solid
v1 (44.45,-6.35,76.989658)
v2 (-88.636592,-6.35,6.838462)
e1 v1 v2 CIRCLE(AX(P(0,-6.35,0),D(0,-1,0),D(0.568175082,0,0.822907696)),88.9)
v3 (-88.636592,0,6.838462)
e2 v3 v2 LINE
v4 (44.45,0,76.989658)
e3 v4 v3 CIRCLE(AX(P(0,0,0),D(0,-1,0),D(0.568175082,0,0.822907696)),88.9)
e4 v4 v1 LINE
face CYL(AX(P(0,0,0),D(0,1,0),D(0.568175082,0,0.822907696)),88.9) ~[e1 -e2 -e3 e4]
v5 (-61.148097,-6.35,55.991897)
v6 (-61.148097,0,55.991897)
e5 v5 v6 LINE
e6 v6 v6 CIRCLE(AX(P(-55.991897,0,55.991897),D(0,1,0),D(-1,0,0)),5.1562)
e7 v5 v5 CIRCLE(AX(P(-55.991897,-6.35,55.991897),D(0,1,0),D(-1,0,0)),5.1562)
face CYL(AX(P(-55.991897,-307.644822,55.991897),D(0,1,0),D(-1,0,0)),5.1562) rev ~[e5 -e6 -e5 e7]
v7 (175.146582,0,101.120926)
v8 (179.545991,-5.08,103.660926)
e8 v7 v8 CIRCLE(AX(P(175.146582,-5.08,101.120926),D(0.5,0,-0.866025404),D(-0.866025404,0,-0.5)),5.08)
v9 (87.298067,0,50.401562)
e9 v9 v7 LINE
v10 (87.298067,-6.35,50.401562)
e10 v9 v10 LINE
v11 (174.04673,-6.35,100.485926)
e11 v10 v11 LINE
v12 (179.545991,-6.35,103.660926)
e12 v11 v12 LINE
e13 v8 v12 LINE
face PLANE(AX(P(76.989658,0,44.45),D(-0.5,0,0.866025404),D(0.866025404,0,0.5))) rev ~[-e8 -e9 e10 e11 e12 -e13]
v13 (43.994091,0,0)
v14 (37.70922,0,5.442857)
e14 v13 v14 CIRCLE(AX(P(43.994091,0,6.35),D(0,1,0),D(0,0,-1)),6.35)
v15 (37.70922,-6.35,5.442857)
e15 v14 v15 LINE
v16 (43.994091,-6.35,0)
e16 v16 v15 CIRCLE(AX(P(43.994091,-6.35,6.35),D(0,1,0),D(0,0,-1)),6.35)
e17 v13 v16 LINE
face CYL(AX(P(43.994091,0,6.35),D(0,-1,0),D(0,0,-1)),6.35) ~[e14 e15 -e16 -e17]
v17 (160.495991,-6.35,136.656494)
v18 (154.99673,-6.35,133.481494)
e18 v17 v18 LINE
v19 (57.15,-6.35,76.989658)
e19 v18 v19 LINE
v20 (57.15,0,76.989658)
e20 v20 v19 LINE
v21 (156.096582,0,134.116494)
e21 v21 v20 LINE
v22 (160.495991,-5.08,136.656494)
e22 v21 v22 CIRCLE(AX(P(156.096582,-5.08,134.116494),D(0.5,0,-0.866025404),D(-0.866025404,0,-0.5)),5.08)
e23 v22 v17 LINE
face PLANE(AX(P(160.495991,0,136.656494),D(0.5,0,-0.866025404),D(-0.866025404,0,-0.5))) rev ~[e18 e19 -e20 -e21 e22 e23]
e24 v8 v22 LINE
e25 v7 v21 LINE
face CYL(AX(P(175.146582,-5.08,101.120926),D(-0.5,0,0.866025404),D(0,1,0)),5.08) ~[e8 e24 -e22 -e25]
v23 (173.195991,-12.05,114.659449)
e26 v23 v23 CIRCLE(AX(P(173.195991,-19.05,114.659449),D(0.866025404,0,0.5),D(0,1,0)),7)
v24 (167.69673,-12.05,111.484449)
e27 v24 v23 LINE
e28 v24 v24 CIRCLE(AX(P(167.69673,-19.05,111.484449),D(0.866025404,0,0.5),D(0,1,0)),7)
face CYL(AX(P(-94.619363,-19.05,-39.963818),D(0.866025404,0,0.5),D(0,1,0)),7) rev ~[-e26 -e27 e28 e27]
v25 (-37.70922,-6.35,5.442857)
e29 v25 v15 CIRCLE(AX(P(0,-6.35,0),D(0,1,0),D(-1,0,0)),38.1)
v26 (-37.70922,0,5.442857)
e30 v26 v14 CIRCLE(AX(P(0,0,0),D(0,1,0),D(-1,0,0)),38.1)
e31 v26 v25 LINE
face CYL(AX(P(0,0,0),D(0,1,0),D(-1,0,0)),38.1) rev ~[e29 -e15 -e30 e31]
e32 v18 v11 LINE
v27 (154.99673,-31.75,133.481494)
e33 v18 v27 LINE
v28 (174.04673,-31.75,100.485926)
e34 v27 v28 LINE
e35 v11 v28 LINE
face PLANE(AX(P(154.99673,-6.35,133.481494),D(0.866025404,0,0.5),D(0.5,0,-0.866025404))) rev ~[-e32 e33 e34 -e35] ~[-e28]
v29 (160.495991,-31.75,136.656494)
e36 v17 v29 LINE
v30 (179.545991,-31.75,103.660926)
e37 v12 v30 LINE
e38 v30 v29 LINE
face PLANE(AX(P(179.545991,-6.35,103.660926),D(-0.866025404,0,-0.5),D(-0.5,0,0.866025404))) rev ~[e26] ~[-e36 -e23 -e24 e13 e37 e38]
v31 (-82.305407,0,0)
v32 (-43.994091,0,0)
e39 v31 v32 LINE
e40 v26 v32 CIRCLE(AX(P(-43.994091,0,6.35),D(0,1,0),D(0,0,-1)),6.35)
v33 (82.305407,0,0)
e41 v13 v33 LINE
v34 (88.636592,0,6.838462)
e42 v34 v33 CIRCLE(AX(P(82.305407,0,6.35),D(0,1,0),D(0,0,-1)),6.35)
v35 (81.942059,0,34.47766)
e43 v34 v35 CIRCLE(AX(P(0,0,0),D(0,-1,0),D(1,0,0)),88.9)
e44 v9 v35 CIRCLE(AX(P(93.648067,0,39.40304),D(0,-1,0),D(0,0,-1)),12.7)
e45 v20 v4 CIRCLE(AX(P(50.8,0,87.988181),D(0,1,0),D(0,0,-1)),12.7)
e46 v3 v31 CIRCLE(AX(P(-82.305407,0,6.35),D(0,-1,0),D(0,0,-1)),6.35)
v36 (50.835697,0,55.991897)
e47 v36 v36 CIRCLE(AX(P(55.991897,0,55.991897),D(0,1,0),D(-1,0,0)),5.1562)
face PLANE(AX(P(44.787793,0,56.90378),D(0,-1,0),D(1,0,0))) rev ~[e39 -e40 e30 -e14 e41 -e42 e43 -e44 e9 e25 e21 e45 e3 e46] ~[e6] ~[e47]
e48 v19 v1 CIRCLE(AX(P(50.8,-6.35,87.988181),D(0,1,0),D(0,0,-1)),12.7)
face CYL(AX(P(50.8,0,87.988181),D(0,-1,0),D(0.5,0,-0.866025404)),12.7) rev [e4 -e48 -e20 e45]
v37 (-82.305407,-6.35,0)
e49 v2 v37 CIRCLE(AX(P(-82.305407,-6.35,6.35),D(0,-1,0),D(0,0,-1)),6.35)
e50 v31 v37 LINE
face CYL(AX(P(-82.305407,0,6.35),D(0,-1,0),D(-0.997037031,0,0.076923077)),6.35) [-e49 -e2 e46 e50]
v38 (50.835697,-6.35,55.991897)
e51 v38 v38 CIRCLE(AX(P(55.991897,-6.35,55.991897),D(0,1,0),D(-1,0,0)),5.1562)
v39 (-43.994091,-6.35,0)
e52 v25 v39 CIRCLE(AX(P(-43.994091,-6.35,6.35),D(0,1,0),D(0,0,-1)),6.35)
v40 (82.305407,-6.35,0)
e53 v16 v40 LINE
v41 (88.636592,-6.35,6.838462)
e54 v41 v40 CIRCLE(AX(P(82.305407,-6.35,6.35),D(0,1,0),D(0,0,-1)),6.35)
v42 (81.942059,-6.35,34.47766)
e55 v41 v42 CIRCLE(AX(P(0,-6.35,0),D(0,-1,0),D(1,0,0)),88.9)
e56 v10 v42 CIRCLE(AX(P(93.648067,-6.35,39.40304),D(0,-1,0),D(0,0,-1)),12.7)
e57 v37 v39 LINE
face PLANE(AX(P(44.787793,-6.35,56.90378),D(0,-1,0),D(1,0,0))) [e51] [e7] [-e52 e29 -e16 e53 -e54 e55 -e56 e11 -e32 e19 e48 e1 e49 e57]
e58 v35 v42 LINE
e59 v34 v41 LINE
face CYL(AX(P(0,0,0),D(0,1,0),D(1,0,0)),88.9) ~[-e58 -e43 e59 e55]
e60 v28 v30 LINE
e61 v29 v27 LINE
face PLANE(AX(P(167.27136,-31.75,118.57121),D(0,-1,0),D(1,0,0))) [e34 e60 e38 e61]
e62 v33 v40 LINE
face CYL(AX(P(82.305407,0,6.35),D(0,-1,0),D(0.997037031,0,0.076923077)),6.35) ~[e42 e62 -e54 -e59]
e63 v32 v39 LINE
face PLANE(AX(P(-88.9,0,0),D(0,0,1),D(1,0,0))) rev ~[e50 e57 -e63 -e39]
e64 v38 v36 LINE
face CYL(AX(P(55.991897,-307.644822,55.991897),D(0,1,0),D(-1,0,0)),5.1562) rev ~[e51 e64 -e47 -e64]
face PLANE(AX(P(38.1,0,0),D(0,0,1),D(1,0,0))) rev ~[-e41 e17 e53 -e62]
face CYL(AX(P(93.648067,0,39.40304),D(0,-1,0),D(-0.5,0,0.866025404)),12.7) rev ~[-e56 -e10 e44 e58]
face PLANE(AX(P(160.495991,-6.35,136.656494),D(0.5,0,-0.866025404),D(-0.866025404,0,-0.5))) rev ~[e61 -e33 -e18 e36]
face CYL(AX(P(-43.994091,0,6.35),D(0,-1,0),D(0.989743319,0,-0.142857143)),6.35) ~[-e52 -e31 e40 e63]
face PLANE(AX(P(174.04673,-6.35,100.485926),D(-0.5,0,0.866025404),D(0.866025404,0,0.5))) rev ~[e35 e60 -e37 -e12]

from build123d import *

# Parameters (mm, degrees)
F1_DEPTH = 6.35
F3_D     = 10.3124
F5_DEPTH = 25.4
F7_D     = 14
F8_R     = 12.7
F9_R     = 5.08
F10_R    = 6.35


# Not quite as in the source:
# - a feature names something its author has since deleted; it is built from what else it names


with BuildPart() as f1:
    # F0 (on Front) → F1 (new body)
    with BuildSketch(Plane.XZ):
        with BuildLine():
            Line((38.1, 0), (88.9, 0))
            ThreePointArc((88.9, 0), (85.8708059571, 23.0090131096), (76.9896583964, 44.45))
            Line((76.9896583964, 44.45), (179.5459910838, 103.6609262841))
            Line((179.5459910838, 103.6609262841), (160.4959910838, 136.6564941683))
            Line((160.4959910838, 136.6564941683), (50.5107648032, 73.1564941683))
            ThreePointArc((50.5107648032, 73.1564941683), (-41.3086129578, 78.7198100576), (-88.9, 0))
            Line((-88.9, 0), (-38.1, 0))
            ThreePointArc((-38.1, 0), (0, 38.1), (38.1, 0))
        make_face()
    extrude(amount=F1_DEPTH)

    # F3 (through all)
    with Locations(Plane.XZ.offset(6.35)):
        with Locations((-55.9918969149, 55.9918969149), (55.9918969149, 55.9918969149)):
            Hole(F3_D / 2)

    # F4 (on face) → F5 (join)
    with BuildSketch(Plane.XZ.offset(6.35)):
        Polygon((160.4959910838, 136.6564941683), (154.9967297697, 133.4814941683), (174.0467297697, 100.4859262841), (179.5459910838, 103.6609262841), align=None)
    extrude(amount=F5_DEPTH)

    # F7 (through all)
    with Locations(Plane(origin=(174.0467297697, 0, 100.4859262841), x_dir=(0, -1, 0), z_dir=(-0.8660254038, 0, -0.5))):
        with Locations((19.05, 12.7)):
            Hole(F7_D / 2)

    # F8
    f8_edges = [f1.edges().sort_by_distance(p)[0] for p in [
        (50.510765, -3.175, 73.156494),
        (76.989658, -3.175, 44.45),
    ]]
    fillet(f8_edges, radius=F8_R)

    # F9
    f9_edges = [f1.edges().sort_by_distance(p)[0] for p in [
        (170.020991, 0, 120.15871),
    ]]
    fillet(f9_edges, radius=F9_R)

    # F10
    f10_edges = [f1.edges().sort_by_distance(p)[0] for p in [
        (88.9, -3.175, 0),
        (38.1, -3.175, 0),
        (-38.1, -3.175, 0),
        (-88.9, -3.175, 0),
    ]]
    fillet(f10_edges, radius=F10_R)


solid = f1.part
